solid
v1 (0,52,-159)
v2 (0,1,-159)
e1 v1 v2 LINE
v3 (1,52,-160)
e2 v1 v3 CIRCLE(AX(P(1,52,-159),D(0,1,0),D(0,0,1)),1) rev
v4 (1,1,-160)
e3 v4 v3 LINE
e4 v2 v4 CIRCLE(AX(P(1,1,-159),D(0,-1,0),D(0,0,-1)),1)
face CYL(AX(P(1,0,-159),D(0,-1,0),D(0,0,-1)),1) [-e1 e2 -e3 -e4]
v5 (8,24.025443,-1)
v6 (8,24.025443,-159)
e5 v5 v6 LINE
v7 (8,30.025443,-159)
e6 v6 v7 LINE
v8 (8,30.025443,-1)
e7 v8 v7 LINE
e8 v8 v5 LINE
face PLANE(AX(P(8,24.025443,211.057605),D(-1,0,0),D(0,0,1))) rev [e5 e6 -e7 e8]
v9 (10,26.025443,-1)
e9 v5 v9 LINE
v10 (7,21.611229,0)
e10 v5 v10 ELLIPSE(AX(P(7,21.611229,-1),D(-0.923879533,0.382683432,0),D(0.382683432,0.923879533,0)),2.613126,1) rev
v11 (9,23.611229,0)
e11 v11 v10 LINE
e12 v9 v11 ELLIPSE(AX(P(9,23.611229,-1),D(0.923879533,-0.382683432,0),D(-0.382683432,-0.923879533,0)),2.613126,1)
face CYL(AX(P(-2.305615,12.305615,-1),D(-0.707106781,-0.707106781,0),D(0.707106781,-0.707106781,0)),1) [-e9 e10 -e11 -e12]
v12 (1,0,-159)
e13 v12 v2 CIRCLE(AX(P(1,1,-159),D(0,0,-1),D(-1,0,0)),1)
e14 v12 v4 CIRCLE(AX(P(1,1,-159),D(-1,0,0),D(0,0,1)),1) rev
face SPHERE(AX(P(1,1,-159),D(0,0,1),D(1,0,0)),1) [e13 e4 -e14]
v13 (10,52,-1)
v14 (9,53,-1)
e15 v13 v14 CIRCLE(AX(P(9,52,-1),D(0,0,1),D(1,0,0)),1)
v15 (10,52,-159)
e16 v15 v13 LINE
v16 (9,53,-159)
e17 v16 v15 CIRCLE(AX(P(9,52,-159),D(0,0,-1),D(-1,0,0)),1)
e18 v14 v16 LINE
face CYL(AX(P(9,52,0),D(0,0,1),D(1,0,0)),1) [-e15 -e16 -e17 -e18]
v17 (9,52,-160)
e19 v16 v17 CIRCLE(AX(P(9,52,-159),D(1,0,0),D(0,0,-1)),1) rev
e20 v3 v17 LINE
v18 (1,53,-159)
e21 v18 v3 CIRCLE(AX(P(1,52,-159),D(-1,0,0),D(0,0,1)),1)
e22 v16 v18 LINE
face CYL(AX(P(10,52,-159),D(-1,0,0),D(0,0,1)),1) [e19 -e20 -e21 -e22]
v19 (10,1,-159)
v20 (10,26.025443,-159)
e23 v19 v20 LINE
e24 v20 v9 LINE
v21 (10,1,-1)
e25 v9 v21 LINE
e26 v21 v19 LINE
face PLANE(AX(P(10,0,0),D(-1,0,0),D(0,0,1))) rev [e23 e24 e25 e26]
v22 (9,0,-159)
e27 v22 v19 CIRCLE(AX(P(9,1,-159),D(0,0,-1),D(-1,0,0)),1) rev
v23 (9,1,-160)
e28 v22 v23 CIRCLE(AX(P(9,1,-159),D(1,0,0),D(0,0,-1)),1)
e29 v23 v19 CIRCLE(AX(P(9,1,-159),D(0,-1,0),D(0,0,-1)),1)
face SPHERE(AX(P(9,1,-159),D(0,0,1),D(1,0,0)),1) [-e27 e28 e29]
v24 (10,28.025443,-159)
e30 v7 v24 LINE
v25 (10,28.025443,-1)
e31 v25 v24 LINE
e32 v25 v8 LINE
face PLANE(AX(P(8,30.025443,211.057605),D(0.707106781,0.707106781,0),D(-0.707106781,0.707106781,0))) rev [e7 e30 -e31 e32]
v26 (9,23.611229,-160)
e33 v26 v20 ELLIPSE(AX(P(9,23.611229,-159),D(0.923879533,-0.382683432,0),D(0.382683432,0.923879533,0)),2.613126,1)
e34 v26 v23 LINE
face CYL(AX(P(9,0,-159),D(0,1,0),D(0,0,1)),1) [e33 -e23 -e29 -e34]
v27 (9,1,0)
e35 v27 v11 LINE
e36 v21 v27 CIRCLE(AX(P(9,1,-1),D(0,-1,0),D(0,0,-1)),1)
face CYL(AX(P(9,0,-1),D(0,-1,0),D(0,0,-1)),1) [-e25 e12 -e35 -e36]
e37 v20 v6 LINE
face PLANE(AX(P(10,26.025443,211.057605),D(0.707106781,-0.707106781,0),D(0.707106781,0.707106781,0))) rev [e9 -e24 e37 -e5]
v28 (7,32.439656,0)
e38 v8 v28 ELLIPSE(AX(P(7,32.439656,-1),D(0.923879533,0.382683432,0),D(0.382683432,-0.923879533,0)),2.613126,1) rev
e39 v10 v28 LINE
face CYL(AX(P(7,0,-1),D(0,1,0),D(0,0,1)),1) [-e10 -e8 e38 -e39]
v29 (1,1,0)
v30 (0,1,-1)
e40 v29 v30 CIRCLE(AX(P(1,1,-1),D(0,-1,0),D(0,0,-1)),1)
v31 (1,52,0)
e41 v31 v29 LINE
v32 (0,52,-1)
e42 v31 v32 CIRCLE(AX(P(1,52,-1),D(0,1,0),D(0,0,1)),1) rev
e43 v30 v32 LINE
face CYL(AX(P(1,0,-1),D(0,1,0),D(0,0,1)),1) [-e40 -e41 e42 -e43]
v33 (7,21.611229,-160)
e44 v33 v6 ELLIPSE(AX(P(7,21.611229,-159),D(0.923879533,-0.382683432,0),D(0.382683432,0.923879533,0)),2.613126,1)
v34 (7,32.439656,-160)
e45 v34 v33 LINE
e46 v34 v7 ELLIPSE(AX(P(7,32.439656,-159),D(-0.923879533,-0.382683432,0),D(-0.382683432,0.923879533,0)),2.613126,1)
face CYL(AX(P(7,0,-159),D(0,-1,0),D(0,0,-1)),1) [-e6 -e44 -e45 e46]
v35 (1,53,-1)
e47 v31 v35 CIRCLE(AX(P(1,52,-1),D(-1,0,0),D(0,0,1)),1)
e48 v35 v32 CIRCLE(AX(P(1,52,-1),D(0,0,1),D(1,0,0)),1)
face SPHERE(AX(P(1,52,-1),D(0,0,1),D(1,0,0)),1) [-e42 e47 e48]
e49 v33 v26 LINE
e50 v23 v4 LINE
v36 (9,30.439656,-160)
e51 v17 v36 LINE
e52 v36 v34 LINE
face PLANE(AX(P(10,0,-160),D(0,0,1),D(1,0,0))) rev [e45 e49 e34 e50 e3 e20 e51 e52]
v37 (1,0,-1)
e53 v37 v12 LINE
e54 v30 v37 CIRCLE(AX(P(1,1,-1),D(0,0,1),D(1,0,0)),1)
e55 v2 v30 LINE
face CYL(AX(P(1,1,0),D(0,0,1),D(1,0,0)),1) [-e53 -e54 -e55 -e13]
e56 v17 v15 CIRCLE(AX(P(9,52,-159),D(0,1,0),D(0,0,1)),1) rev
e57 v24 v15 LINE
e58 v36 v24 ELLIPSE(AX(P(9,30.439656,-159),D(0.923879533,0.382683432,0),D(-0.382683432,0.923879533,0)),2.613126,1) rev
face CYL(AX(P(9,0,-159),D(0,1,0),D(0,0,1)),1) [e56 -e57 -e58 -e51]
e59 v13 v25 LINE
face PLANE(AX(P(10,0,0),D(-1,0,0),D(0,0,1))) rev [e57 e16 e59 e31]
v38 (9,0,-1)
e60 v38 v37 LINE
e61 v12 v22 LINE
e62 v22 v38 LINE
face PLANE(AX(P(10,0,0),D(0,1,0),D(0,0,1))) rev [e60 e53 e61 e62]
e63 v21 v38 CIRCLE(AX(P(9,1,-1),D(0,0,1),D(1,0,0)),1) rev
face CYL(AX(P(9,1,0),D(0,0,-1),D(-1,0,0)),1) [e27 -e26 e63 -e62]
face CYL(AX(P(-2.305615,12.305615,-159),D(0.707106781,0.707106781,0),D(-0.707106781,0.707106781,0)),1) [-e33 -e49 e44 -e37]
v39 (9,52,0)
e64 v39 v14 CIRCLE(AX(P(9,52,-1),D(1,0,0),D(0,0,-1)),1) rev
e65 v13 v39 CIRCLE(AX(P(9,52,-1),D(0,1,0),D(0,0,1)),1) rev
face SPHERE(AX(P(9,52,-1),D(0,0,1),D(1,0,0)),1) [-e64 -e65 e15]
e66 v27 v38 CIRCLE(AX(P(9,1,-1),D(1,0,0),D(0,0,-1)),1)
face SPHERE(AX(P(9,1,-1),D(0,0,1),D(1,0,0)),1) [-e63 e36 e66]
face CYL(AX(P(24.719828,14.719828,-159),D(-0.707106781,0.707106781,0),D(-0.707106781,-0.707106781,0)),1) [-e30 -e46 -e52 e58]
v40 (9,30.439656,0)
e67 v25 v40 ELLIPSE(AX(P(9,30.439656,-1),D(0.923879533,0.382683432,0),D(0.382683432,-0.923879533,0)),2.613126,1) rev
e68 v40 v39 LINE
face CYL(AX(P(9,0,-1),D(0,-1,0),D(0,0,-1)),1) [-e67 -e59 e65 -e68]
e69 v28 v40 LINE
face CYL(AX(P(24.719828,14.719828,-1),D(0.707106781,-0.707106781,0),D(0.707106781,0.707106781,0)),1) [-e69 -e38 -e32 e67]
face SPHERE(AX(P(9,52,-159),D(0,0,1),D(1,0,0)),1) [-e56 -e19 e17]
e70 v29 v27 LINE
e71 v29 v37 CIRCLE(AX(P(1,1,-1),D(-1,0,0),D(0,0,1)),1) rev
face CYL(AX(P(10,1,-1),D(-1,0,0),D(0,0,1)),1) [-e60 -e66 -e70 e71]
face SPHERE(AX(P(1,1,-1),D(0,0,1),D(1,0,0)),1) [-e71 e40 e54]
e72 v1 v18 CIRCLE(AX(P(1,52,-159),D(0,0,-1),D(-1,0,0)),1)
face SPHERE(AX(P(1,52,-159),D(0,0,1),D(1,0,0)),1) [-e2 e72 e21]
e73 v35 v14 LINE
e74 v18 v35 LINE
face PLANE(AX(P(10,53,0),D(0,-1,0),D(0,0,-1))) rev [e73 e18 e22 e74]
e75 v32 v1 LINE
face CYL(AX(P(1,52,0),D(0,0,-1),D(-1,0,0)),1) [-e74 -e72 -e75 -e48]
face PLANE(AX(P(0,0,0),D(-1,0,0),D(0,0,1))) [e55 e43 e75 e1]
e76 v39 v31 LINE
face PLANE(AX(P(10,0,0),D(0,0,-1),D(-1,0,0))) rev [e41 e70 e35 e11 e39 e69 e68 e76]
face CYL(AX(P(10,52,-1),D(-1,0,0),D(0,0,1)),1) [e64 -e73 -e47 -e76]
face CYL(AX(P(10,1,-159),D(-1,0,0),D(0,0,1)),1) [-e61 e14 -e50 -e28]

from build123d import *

# Parameters (mm, degrees)
SKETCH1_W           = 160
SKETCH1_H           = 53
BOSS_EXTRUDE1_DEPTH = 10
CUT_EXTRUDE2_START  = -160
CUT_EXTRUDE2_DEPTH  = 160
FILLET1_R           = 1


# Read off the part's stored shape, not the designer's step: Cut-Extrude2
with BuildPart() as part:
    # Sketch1 → Boss-Extrude1 (new body)
    with BuildSketch(Plane(origin=(0, 0, 0), x_dir=(0, 0, -1), z_dir=(1, 0, 0))):
        with Locations((80, 26.5)):
            Rectangle(SKETCH1_W, SKETCH1_H)
    extrude(amount=BOSS_EXTRUDE1_DEPTH)

    # Cut-Extrude2 outline → Cut-Extrude2 (cut)
    with BuildSketch(Plane.XY.offset(CUT_EXTRUDE2_START)):
        Polygon((10, 28.025442771), (8, 30.025442771), (8, 24.025442771), (10, 26.025442771), align=None)
    extrude(amount=CUT_EXTRUDE2_DEPTH, mode=Mode.SUBTRACT)

    # Fillet1
    fillet1_edges = [part.edges().sort_by_distance(p)[0] for p in [
        (10, 13.012721386, -160),
        (10, 53, -80),
        (10, 13.012721386, 0),
        (10, 40.512721386, -160),
        (8, 27.025442771, -160),
        (8, 27.025442771, 0),
        (9, 25.025442771, 0),
        (9, 29.025442771, 0),
        (9, 25.025442771, -160),
        (9, 29.025442771, -160),
        (10, 40.512721386, 0),
        (0, 53, -80),
        (0, 26.5, -160),
        (0, 0, -80),
        (0, 26.5, 0),
        (10, 0, -80),
        (5, 53, 0),
        (5, 53, -160),
        (5, 0, -160),
        (5, 0, 0),
    ]]
    fillet(fillet1_edges, radius=FILLET1_R)


solid = part.part
